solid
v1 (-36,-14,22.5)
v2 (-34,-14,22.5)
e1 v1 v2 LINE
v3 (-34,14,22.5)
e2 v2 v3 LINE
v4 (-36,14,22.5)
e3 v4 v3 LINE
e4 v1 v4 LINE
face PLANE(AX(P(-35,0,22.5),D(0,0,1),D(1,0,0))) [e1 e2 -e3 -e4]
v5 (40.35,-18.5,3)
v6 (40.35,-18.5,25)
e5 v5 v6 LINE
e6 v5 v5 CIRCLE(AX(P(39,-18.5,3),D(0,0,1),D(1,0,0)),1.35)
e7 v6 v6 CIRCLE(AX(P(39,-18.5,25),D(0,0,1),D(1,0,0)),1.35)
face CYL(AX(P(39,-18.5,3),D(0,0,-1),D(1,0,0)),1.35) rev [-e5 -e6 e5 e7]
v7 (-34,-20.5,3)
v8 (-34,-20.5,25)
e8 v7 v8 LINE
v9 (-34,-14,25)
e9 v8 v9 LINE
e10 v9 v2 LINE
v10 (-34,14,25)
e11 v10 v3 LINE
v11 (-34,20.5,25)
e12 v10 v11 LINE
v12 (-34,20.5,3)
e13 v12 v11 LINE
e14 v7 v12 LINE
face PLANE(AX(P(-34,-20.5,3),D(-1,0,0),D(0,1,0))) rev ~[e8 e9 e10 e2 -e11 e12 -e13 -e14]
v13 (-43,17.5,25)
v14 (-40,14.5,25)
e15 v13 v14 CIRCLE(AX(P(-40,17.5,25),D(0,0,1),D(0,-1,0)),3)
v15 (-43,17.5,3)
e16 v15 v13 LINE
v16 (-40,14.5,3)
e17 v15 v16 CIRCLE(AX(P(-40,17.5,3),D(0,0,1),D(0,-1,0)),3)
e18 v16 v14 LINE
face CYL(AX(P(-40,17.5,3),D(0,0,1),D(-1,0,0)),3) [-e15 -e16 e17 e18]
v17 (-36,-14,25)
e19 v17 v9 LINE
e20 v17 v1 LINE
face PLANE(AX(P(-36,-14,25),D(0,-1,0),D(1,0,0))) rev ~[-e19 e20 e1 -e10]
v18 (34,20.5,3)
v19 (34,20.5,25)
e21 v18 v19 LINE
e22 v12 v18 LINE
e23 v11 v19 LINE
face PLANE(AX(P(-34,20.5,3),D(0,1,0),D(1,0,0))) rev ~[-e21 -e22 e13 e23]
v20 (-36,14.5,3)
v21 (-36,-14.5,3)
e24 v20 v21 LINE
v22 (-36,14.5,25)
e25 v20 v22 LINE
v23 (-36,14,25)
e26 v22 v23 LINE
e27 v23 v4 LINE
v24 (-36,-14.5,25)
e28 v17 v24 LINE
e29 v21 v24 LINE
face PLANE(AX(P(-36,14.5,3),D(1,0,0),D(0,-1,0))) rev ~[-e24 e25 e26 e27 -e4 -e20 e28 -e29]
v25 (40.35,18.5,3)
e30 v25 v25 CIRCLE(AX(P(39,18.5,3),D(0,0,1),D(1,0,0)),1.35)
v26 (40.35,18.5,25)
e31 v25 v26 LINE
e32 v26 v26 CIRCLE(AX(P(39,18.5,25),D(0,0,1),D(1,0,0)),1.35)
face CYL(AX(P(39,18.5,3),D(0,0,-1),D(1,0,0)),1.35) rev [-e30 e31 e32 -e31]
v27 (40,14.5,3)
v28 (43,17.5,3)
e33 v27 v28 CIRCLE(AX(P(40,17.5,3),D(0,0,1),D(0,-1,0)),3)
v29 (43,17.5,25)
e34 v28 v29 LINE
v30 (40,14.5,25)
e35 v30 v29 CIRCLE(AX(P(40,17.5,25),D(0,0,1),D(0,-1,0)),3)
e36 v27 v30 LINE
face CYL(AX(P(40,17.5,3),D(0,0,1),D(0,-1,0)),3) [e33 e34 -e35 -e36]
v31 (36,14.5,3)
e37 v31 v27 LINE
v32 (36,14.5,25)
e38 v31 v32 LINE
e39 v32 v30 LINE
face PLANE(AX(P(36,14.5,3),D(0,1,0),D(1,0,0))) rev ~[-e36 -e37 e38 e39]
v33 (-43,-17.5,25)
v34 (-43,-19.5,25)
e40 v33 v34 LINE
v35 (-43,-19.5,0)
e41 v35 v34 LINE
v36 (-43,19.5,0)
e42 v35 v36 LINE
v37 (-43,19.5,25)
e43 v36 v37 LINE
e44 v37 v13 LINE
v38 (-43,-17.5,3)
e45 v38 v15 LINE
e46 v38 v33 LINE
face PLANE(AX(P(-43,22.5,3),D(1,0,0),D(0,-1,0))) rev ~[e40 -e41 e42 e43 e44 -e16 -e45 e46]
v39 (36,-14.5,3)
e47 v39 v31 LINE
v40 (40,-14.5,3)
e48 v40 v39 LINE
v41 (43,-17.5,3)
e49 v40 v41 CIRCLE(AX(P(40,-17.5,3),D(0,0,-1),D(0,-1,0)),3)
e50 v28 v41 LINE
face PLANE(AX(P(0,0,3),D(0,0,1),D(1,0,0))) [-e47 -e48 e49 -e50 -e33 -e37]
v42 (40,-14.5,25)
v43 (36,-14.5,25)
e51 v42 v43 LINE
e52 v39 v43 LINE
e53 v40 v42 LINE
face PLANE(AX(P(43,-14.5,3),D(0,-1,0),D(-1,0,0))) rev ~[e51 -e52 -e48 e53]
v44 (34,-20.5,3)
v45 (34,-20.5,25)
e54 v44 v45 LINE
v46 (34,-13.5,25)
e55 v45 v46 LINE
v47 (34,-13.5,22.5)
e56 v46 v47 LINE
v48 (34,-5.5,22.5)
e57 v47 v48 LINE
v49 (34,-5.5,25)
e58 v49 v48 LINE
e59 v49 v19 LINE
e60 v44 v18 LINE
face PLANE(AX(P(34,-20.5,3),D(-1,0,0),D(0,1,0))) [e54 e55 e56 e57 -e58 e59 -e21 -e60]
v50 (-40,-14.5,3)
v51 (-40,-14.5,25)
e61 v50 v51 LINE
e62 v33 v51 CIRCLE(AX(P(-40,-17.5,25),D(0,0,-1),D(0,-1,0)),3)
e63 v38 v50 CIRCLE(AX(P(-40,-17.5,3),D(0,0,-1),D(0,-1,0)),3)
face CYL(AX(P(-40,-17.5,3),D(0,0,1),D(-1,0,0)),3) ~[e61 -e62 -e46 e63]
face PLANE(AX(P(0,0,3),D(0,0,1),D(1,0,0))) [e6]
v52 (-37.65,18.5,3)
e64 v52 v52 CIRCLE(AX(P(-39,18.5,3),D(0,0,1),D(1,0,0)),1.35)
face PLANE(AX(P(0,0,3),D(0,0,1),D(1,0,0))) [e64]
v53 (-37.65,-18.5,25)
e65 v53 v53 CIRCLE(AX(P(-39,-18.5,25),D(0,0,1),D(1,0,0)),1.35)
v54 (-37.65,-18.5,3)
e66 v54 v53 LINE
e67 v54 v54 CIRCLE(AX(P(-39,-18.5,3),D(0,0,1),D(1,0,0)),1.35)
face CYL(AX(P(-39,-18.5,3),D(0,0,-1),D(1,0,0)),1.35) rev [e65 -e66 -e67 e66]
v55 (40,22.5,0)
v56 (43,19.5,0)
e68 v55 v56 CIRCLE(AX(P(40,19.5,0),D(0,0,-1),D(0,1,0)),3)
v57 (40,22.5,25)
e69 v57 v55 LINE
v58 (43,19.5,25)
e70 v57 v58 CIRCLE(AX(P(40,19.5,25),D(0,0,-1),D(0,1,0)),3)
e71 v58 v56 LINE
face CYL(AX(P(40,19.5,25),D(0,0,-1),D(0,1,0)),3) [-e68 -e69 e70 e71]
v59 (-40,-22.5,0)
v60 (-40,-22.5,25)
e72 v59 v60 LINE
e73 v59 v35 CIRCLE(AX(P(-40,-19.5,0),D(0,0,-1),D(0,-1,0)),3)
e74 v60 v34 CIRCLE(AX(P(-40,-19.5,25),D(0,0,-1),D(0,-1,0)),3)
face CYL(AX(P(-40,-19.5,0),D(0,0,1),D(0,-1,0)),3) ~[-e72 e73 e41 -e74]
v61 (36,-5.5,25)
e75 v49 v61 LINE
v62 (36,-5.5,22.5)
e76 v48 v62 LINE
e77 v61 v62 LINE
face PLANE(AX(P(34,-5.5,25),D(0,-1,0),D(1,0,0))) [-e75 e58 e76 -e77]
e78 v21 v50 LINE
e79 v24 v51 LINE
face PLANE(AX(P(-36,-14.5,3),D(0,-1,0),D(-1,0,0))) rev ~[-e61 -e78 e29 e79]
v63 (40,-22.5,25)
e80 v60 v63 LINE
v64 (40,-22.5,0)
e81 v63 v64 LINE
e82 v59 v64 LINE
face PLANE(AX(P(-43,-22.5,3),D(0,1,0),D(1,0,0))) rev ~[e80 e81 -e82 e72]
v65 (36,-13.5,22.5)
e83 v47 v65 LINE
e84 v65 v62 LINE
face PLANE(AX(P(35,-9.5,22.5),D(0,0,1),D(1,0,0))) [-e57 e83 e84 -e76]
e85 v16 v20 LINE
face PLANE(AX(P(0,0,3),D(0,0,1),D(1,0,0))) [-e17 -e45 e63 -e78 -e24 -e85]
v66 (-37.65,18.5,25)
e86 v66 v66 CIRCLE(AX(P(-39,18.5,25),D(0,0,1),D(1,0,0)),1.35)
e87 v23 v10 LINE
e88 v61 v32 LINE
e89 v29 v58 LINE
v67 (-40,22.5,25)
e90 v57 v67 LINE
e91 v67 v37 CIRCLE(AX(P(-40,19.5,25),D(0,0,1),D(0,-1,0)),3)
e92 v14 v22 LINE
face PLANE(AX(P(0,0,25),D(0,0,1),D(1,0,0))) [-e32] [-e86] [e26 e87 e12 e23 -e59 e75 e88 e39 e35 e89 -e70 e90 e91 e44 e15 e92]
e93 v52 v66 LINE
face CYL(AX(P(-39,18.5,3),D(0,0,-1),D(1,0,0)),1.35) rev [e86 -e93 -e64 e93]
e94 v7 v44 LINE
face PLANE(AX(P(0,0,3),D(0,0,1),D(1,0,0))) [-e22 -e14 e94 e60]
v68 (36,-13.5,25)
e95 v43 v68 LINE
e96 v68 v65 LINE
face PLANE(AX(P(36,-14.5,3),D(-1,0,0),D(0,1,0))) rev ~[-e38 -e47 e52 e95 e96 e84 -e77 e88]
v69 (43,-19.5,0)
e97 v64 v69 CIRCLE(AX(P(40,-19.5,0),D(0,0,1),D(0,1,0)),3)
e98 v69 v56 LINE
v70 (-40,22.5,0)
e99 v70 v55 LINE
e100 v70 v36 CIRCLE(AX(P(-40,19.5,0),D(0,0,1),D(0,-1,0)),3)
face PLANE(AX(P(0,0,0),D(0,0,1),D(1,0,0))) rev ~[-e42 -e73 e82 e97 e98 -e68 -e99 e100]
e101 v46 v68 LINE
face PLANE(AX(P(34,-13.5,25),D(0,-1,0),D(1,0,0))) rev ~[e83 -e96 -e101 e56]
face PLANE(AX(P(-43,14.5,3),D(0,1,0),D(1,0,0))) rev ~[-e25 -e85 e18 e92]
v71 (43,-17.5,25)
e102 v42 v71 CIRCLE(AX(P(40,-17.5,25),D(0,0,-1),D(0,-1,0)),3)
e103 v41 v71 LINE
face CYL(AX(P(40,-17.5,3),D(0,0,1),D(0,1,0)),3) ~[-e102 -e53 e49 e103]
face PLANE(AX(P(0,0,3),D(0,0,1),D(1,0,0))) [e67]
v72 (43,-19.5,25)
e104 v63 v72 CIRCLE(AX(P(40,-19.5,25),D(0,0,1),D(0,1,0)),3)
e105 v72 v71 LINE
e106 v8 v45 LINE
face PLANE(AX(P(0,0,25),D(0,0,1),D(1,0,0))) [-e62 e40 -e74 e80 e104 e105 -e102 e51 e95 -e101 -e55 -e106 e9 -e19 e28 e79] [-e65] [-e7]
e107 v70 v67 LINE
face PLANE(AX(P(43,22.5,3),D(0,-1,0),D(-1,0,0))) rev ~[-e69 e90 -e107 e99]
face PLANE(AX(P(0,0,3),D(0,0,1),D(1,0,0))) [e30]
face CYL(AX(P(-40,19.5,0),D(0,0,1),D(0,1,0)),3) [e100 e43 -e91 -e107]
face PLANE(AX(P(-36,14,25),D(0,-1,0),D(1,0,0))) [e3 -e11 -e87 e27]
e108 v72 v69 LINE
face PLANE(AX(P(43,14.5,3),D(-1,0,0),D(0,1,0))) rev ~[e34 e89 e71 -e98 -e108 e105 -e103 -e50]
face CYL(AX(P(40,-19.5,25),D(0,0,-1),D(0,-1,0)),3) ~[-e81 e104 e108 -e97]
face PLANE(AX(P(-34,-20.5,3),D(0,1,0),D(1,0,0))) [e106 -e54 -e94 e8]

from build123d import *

# Parameters (mm, degrees)
F0_W     = 86
F0_H     = 45
F1_DEPTH = 3
F2_R     = 1.35
F2_W     = 68
F2_H     = 41
F3_DEPTH = 22
F4_R     = 3
F5_W     = 2
F5_H     = 28
F5_H_2   = 8
F6_DEPTH = 2.5


# Not quite as in the source:
# - a feature names something its author has since deleted; it is built from what else it names


with BuildPart() as f1:
    # F0 (on Top) → F1 (new body)
    with BuildSketch(Plane.XY):
        Rectangle(F0_W, F0_H)
    extrude(amount=F1_DEPTH)

    # F2 (on face) → F3 (join)
    with BuildSketch(Plane.XY.offset(3)):
        Polygon((43, 22.5), (-43, 22.5), (-43, 14.5), (-36, 14.5), (-36, -14.5), (-43, -14.5), (-43, -22.5), (43, -22.5), (43, -14.5), (36, -14.5), (36, 14.5), (43, 14.5), align=None)
        with Locations((-39, -18.5)):
            Circle(F2_R, mode=Mode.SUBTRACT)
        with Locations((39, -18.5)):
            Circle(F2_R, mode=Mode.SUBTRACT)
        with Locations((-39, 18.5)):
            Circle(F2_R, mode=Mode.SUBTRACT)
        Rectangle(F2_W, F2_H, mode=Mode.SUBTRACT)
        with Locations((39, 18.5)):
            Circle(F2_R, mode=Mode.SUBTRACT)
    extrude(amount=F3_DEPTH)

    # F4
    f4_edges = [f1.edges().sort_by_distance(p)[0] for p in [
        (-43, -22.5, 12.5),
        (-43, 14.5, 14),
        (-43, 22.5, 12.5),
        (-43, -14.5, 14),
        (43, -22.5, 12.5),
        (43, -14.5, 14),
        (43, 14.5, 14),
        (43, 22.5, 12.5),
    ]]
    fillet(f4_edges, radius=F4_R)

    # F5 (on face) → F6 (cut)
    with BuildSketch(Plane.XY.offset(25)):
        with Locations((-35, 0)):
            Rectangle(F5_W, F5_H)
        with Locations((35, -9.5)):
            Rectangle(F5_W, F5_H_2)
    extrude(amount=-F6_DEPTH, mode=Mode.SUBTRACT)


solid = f1.part
